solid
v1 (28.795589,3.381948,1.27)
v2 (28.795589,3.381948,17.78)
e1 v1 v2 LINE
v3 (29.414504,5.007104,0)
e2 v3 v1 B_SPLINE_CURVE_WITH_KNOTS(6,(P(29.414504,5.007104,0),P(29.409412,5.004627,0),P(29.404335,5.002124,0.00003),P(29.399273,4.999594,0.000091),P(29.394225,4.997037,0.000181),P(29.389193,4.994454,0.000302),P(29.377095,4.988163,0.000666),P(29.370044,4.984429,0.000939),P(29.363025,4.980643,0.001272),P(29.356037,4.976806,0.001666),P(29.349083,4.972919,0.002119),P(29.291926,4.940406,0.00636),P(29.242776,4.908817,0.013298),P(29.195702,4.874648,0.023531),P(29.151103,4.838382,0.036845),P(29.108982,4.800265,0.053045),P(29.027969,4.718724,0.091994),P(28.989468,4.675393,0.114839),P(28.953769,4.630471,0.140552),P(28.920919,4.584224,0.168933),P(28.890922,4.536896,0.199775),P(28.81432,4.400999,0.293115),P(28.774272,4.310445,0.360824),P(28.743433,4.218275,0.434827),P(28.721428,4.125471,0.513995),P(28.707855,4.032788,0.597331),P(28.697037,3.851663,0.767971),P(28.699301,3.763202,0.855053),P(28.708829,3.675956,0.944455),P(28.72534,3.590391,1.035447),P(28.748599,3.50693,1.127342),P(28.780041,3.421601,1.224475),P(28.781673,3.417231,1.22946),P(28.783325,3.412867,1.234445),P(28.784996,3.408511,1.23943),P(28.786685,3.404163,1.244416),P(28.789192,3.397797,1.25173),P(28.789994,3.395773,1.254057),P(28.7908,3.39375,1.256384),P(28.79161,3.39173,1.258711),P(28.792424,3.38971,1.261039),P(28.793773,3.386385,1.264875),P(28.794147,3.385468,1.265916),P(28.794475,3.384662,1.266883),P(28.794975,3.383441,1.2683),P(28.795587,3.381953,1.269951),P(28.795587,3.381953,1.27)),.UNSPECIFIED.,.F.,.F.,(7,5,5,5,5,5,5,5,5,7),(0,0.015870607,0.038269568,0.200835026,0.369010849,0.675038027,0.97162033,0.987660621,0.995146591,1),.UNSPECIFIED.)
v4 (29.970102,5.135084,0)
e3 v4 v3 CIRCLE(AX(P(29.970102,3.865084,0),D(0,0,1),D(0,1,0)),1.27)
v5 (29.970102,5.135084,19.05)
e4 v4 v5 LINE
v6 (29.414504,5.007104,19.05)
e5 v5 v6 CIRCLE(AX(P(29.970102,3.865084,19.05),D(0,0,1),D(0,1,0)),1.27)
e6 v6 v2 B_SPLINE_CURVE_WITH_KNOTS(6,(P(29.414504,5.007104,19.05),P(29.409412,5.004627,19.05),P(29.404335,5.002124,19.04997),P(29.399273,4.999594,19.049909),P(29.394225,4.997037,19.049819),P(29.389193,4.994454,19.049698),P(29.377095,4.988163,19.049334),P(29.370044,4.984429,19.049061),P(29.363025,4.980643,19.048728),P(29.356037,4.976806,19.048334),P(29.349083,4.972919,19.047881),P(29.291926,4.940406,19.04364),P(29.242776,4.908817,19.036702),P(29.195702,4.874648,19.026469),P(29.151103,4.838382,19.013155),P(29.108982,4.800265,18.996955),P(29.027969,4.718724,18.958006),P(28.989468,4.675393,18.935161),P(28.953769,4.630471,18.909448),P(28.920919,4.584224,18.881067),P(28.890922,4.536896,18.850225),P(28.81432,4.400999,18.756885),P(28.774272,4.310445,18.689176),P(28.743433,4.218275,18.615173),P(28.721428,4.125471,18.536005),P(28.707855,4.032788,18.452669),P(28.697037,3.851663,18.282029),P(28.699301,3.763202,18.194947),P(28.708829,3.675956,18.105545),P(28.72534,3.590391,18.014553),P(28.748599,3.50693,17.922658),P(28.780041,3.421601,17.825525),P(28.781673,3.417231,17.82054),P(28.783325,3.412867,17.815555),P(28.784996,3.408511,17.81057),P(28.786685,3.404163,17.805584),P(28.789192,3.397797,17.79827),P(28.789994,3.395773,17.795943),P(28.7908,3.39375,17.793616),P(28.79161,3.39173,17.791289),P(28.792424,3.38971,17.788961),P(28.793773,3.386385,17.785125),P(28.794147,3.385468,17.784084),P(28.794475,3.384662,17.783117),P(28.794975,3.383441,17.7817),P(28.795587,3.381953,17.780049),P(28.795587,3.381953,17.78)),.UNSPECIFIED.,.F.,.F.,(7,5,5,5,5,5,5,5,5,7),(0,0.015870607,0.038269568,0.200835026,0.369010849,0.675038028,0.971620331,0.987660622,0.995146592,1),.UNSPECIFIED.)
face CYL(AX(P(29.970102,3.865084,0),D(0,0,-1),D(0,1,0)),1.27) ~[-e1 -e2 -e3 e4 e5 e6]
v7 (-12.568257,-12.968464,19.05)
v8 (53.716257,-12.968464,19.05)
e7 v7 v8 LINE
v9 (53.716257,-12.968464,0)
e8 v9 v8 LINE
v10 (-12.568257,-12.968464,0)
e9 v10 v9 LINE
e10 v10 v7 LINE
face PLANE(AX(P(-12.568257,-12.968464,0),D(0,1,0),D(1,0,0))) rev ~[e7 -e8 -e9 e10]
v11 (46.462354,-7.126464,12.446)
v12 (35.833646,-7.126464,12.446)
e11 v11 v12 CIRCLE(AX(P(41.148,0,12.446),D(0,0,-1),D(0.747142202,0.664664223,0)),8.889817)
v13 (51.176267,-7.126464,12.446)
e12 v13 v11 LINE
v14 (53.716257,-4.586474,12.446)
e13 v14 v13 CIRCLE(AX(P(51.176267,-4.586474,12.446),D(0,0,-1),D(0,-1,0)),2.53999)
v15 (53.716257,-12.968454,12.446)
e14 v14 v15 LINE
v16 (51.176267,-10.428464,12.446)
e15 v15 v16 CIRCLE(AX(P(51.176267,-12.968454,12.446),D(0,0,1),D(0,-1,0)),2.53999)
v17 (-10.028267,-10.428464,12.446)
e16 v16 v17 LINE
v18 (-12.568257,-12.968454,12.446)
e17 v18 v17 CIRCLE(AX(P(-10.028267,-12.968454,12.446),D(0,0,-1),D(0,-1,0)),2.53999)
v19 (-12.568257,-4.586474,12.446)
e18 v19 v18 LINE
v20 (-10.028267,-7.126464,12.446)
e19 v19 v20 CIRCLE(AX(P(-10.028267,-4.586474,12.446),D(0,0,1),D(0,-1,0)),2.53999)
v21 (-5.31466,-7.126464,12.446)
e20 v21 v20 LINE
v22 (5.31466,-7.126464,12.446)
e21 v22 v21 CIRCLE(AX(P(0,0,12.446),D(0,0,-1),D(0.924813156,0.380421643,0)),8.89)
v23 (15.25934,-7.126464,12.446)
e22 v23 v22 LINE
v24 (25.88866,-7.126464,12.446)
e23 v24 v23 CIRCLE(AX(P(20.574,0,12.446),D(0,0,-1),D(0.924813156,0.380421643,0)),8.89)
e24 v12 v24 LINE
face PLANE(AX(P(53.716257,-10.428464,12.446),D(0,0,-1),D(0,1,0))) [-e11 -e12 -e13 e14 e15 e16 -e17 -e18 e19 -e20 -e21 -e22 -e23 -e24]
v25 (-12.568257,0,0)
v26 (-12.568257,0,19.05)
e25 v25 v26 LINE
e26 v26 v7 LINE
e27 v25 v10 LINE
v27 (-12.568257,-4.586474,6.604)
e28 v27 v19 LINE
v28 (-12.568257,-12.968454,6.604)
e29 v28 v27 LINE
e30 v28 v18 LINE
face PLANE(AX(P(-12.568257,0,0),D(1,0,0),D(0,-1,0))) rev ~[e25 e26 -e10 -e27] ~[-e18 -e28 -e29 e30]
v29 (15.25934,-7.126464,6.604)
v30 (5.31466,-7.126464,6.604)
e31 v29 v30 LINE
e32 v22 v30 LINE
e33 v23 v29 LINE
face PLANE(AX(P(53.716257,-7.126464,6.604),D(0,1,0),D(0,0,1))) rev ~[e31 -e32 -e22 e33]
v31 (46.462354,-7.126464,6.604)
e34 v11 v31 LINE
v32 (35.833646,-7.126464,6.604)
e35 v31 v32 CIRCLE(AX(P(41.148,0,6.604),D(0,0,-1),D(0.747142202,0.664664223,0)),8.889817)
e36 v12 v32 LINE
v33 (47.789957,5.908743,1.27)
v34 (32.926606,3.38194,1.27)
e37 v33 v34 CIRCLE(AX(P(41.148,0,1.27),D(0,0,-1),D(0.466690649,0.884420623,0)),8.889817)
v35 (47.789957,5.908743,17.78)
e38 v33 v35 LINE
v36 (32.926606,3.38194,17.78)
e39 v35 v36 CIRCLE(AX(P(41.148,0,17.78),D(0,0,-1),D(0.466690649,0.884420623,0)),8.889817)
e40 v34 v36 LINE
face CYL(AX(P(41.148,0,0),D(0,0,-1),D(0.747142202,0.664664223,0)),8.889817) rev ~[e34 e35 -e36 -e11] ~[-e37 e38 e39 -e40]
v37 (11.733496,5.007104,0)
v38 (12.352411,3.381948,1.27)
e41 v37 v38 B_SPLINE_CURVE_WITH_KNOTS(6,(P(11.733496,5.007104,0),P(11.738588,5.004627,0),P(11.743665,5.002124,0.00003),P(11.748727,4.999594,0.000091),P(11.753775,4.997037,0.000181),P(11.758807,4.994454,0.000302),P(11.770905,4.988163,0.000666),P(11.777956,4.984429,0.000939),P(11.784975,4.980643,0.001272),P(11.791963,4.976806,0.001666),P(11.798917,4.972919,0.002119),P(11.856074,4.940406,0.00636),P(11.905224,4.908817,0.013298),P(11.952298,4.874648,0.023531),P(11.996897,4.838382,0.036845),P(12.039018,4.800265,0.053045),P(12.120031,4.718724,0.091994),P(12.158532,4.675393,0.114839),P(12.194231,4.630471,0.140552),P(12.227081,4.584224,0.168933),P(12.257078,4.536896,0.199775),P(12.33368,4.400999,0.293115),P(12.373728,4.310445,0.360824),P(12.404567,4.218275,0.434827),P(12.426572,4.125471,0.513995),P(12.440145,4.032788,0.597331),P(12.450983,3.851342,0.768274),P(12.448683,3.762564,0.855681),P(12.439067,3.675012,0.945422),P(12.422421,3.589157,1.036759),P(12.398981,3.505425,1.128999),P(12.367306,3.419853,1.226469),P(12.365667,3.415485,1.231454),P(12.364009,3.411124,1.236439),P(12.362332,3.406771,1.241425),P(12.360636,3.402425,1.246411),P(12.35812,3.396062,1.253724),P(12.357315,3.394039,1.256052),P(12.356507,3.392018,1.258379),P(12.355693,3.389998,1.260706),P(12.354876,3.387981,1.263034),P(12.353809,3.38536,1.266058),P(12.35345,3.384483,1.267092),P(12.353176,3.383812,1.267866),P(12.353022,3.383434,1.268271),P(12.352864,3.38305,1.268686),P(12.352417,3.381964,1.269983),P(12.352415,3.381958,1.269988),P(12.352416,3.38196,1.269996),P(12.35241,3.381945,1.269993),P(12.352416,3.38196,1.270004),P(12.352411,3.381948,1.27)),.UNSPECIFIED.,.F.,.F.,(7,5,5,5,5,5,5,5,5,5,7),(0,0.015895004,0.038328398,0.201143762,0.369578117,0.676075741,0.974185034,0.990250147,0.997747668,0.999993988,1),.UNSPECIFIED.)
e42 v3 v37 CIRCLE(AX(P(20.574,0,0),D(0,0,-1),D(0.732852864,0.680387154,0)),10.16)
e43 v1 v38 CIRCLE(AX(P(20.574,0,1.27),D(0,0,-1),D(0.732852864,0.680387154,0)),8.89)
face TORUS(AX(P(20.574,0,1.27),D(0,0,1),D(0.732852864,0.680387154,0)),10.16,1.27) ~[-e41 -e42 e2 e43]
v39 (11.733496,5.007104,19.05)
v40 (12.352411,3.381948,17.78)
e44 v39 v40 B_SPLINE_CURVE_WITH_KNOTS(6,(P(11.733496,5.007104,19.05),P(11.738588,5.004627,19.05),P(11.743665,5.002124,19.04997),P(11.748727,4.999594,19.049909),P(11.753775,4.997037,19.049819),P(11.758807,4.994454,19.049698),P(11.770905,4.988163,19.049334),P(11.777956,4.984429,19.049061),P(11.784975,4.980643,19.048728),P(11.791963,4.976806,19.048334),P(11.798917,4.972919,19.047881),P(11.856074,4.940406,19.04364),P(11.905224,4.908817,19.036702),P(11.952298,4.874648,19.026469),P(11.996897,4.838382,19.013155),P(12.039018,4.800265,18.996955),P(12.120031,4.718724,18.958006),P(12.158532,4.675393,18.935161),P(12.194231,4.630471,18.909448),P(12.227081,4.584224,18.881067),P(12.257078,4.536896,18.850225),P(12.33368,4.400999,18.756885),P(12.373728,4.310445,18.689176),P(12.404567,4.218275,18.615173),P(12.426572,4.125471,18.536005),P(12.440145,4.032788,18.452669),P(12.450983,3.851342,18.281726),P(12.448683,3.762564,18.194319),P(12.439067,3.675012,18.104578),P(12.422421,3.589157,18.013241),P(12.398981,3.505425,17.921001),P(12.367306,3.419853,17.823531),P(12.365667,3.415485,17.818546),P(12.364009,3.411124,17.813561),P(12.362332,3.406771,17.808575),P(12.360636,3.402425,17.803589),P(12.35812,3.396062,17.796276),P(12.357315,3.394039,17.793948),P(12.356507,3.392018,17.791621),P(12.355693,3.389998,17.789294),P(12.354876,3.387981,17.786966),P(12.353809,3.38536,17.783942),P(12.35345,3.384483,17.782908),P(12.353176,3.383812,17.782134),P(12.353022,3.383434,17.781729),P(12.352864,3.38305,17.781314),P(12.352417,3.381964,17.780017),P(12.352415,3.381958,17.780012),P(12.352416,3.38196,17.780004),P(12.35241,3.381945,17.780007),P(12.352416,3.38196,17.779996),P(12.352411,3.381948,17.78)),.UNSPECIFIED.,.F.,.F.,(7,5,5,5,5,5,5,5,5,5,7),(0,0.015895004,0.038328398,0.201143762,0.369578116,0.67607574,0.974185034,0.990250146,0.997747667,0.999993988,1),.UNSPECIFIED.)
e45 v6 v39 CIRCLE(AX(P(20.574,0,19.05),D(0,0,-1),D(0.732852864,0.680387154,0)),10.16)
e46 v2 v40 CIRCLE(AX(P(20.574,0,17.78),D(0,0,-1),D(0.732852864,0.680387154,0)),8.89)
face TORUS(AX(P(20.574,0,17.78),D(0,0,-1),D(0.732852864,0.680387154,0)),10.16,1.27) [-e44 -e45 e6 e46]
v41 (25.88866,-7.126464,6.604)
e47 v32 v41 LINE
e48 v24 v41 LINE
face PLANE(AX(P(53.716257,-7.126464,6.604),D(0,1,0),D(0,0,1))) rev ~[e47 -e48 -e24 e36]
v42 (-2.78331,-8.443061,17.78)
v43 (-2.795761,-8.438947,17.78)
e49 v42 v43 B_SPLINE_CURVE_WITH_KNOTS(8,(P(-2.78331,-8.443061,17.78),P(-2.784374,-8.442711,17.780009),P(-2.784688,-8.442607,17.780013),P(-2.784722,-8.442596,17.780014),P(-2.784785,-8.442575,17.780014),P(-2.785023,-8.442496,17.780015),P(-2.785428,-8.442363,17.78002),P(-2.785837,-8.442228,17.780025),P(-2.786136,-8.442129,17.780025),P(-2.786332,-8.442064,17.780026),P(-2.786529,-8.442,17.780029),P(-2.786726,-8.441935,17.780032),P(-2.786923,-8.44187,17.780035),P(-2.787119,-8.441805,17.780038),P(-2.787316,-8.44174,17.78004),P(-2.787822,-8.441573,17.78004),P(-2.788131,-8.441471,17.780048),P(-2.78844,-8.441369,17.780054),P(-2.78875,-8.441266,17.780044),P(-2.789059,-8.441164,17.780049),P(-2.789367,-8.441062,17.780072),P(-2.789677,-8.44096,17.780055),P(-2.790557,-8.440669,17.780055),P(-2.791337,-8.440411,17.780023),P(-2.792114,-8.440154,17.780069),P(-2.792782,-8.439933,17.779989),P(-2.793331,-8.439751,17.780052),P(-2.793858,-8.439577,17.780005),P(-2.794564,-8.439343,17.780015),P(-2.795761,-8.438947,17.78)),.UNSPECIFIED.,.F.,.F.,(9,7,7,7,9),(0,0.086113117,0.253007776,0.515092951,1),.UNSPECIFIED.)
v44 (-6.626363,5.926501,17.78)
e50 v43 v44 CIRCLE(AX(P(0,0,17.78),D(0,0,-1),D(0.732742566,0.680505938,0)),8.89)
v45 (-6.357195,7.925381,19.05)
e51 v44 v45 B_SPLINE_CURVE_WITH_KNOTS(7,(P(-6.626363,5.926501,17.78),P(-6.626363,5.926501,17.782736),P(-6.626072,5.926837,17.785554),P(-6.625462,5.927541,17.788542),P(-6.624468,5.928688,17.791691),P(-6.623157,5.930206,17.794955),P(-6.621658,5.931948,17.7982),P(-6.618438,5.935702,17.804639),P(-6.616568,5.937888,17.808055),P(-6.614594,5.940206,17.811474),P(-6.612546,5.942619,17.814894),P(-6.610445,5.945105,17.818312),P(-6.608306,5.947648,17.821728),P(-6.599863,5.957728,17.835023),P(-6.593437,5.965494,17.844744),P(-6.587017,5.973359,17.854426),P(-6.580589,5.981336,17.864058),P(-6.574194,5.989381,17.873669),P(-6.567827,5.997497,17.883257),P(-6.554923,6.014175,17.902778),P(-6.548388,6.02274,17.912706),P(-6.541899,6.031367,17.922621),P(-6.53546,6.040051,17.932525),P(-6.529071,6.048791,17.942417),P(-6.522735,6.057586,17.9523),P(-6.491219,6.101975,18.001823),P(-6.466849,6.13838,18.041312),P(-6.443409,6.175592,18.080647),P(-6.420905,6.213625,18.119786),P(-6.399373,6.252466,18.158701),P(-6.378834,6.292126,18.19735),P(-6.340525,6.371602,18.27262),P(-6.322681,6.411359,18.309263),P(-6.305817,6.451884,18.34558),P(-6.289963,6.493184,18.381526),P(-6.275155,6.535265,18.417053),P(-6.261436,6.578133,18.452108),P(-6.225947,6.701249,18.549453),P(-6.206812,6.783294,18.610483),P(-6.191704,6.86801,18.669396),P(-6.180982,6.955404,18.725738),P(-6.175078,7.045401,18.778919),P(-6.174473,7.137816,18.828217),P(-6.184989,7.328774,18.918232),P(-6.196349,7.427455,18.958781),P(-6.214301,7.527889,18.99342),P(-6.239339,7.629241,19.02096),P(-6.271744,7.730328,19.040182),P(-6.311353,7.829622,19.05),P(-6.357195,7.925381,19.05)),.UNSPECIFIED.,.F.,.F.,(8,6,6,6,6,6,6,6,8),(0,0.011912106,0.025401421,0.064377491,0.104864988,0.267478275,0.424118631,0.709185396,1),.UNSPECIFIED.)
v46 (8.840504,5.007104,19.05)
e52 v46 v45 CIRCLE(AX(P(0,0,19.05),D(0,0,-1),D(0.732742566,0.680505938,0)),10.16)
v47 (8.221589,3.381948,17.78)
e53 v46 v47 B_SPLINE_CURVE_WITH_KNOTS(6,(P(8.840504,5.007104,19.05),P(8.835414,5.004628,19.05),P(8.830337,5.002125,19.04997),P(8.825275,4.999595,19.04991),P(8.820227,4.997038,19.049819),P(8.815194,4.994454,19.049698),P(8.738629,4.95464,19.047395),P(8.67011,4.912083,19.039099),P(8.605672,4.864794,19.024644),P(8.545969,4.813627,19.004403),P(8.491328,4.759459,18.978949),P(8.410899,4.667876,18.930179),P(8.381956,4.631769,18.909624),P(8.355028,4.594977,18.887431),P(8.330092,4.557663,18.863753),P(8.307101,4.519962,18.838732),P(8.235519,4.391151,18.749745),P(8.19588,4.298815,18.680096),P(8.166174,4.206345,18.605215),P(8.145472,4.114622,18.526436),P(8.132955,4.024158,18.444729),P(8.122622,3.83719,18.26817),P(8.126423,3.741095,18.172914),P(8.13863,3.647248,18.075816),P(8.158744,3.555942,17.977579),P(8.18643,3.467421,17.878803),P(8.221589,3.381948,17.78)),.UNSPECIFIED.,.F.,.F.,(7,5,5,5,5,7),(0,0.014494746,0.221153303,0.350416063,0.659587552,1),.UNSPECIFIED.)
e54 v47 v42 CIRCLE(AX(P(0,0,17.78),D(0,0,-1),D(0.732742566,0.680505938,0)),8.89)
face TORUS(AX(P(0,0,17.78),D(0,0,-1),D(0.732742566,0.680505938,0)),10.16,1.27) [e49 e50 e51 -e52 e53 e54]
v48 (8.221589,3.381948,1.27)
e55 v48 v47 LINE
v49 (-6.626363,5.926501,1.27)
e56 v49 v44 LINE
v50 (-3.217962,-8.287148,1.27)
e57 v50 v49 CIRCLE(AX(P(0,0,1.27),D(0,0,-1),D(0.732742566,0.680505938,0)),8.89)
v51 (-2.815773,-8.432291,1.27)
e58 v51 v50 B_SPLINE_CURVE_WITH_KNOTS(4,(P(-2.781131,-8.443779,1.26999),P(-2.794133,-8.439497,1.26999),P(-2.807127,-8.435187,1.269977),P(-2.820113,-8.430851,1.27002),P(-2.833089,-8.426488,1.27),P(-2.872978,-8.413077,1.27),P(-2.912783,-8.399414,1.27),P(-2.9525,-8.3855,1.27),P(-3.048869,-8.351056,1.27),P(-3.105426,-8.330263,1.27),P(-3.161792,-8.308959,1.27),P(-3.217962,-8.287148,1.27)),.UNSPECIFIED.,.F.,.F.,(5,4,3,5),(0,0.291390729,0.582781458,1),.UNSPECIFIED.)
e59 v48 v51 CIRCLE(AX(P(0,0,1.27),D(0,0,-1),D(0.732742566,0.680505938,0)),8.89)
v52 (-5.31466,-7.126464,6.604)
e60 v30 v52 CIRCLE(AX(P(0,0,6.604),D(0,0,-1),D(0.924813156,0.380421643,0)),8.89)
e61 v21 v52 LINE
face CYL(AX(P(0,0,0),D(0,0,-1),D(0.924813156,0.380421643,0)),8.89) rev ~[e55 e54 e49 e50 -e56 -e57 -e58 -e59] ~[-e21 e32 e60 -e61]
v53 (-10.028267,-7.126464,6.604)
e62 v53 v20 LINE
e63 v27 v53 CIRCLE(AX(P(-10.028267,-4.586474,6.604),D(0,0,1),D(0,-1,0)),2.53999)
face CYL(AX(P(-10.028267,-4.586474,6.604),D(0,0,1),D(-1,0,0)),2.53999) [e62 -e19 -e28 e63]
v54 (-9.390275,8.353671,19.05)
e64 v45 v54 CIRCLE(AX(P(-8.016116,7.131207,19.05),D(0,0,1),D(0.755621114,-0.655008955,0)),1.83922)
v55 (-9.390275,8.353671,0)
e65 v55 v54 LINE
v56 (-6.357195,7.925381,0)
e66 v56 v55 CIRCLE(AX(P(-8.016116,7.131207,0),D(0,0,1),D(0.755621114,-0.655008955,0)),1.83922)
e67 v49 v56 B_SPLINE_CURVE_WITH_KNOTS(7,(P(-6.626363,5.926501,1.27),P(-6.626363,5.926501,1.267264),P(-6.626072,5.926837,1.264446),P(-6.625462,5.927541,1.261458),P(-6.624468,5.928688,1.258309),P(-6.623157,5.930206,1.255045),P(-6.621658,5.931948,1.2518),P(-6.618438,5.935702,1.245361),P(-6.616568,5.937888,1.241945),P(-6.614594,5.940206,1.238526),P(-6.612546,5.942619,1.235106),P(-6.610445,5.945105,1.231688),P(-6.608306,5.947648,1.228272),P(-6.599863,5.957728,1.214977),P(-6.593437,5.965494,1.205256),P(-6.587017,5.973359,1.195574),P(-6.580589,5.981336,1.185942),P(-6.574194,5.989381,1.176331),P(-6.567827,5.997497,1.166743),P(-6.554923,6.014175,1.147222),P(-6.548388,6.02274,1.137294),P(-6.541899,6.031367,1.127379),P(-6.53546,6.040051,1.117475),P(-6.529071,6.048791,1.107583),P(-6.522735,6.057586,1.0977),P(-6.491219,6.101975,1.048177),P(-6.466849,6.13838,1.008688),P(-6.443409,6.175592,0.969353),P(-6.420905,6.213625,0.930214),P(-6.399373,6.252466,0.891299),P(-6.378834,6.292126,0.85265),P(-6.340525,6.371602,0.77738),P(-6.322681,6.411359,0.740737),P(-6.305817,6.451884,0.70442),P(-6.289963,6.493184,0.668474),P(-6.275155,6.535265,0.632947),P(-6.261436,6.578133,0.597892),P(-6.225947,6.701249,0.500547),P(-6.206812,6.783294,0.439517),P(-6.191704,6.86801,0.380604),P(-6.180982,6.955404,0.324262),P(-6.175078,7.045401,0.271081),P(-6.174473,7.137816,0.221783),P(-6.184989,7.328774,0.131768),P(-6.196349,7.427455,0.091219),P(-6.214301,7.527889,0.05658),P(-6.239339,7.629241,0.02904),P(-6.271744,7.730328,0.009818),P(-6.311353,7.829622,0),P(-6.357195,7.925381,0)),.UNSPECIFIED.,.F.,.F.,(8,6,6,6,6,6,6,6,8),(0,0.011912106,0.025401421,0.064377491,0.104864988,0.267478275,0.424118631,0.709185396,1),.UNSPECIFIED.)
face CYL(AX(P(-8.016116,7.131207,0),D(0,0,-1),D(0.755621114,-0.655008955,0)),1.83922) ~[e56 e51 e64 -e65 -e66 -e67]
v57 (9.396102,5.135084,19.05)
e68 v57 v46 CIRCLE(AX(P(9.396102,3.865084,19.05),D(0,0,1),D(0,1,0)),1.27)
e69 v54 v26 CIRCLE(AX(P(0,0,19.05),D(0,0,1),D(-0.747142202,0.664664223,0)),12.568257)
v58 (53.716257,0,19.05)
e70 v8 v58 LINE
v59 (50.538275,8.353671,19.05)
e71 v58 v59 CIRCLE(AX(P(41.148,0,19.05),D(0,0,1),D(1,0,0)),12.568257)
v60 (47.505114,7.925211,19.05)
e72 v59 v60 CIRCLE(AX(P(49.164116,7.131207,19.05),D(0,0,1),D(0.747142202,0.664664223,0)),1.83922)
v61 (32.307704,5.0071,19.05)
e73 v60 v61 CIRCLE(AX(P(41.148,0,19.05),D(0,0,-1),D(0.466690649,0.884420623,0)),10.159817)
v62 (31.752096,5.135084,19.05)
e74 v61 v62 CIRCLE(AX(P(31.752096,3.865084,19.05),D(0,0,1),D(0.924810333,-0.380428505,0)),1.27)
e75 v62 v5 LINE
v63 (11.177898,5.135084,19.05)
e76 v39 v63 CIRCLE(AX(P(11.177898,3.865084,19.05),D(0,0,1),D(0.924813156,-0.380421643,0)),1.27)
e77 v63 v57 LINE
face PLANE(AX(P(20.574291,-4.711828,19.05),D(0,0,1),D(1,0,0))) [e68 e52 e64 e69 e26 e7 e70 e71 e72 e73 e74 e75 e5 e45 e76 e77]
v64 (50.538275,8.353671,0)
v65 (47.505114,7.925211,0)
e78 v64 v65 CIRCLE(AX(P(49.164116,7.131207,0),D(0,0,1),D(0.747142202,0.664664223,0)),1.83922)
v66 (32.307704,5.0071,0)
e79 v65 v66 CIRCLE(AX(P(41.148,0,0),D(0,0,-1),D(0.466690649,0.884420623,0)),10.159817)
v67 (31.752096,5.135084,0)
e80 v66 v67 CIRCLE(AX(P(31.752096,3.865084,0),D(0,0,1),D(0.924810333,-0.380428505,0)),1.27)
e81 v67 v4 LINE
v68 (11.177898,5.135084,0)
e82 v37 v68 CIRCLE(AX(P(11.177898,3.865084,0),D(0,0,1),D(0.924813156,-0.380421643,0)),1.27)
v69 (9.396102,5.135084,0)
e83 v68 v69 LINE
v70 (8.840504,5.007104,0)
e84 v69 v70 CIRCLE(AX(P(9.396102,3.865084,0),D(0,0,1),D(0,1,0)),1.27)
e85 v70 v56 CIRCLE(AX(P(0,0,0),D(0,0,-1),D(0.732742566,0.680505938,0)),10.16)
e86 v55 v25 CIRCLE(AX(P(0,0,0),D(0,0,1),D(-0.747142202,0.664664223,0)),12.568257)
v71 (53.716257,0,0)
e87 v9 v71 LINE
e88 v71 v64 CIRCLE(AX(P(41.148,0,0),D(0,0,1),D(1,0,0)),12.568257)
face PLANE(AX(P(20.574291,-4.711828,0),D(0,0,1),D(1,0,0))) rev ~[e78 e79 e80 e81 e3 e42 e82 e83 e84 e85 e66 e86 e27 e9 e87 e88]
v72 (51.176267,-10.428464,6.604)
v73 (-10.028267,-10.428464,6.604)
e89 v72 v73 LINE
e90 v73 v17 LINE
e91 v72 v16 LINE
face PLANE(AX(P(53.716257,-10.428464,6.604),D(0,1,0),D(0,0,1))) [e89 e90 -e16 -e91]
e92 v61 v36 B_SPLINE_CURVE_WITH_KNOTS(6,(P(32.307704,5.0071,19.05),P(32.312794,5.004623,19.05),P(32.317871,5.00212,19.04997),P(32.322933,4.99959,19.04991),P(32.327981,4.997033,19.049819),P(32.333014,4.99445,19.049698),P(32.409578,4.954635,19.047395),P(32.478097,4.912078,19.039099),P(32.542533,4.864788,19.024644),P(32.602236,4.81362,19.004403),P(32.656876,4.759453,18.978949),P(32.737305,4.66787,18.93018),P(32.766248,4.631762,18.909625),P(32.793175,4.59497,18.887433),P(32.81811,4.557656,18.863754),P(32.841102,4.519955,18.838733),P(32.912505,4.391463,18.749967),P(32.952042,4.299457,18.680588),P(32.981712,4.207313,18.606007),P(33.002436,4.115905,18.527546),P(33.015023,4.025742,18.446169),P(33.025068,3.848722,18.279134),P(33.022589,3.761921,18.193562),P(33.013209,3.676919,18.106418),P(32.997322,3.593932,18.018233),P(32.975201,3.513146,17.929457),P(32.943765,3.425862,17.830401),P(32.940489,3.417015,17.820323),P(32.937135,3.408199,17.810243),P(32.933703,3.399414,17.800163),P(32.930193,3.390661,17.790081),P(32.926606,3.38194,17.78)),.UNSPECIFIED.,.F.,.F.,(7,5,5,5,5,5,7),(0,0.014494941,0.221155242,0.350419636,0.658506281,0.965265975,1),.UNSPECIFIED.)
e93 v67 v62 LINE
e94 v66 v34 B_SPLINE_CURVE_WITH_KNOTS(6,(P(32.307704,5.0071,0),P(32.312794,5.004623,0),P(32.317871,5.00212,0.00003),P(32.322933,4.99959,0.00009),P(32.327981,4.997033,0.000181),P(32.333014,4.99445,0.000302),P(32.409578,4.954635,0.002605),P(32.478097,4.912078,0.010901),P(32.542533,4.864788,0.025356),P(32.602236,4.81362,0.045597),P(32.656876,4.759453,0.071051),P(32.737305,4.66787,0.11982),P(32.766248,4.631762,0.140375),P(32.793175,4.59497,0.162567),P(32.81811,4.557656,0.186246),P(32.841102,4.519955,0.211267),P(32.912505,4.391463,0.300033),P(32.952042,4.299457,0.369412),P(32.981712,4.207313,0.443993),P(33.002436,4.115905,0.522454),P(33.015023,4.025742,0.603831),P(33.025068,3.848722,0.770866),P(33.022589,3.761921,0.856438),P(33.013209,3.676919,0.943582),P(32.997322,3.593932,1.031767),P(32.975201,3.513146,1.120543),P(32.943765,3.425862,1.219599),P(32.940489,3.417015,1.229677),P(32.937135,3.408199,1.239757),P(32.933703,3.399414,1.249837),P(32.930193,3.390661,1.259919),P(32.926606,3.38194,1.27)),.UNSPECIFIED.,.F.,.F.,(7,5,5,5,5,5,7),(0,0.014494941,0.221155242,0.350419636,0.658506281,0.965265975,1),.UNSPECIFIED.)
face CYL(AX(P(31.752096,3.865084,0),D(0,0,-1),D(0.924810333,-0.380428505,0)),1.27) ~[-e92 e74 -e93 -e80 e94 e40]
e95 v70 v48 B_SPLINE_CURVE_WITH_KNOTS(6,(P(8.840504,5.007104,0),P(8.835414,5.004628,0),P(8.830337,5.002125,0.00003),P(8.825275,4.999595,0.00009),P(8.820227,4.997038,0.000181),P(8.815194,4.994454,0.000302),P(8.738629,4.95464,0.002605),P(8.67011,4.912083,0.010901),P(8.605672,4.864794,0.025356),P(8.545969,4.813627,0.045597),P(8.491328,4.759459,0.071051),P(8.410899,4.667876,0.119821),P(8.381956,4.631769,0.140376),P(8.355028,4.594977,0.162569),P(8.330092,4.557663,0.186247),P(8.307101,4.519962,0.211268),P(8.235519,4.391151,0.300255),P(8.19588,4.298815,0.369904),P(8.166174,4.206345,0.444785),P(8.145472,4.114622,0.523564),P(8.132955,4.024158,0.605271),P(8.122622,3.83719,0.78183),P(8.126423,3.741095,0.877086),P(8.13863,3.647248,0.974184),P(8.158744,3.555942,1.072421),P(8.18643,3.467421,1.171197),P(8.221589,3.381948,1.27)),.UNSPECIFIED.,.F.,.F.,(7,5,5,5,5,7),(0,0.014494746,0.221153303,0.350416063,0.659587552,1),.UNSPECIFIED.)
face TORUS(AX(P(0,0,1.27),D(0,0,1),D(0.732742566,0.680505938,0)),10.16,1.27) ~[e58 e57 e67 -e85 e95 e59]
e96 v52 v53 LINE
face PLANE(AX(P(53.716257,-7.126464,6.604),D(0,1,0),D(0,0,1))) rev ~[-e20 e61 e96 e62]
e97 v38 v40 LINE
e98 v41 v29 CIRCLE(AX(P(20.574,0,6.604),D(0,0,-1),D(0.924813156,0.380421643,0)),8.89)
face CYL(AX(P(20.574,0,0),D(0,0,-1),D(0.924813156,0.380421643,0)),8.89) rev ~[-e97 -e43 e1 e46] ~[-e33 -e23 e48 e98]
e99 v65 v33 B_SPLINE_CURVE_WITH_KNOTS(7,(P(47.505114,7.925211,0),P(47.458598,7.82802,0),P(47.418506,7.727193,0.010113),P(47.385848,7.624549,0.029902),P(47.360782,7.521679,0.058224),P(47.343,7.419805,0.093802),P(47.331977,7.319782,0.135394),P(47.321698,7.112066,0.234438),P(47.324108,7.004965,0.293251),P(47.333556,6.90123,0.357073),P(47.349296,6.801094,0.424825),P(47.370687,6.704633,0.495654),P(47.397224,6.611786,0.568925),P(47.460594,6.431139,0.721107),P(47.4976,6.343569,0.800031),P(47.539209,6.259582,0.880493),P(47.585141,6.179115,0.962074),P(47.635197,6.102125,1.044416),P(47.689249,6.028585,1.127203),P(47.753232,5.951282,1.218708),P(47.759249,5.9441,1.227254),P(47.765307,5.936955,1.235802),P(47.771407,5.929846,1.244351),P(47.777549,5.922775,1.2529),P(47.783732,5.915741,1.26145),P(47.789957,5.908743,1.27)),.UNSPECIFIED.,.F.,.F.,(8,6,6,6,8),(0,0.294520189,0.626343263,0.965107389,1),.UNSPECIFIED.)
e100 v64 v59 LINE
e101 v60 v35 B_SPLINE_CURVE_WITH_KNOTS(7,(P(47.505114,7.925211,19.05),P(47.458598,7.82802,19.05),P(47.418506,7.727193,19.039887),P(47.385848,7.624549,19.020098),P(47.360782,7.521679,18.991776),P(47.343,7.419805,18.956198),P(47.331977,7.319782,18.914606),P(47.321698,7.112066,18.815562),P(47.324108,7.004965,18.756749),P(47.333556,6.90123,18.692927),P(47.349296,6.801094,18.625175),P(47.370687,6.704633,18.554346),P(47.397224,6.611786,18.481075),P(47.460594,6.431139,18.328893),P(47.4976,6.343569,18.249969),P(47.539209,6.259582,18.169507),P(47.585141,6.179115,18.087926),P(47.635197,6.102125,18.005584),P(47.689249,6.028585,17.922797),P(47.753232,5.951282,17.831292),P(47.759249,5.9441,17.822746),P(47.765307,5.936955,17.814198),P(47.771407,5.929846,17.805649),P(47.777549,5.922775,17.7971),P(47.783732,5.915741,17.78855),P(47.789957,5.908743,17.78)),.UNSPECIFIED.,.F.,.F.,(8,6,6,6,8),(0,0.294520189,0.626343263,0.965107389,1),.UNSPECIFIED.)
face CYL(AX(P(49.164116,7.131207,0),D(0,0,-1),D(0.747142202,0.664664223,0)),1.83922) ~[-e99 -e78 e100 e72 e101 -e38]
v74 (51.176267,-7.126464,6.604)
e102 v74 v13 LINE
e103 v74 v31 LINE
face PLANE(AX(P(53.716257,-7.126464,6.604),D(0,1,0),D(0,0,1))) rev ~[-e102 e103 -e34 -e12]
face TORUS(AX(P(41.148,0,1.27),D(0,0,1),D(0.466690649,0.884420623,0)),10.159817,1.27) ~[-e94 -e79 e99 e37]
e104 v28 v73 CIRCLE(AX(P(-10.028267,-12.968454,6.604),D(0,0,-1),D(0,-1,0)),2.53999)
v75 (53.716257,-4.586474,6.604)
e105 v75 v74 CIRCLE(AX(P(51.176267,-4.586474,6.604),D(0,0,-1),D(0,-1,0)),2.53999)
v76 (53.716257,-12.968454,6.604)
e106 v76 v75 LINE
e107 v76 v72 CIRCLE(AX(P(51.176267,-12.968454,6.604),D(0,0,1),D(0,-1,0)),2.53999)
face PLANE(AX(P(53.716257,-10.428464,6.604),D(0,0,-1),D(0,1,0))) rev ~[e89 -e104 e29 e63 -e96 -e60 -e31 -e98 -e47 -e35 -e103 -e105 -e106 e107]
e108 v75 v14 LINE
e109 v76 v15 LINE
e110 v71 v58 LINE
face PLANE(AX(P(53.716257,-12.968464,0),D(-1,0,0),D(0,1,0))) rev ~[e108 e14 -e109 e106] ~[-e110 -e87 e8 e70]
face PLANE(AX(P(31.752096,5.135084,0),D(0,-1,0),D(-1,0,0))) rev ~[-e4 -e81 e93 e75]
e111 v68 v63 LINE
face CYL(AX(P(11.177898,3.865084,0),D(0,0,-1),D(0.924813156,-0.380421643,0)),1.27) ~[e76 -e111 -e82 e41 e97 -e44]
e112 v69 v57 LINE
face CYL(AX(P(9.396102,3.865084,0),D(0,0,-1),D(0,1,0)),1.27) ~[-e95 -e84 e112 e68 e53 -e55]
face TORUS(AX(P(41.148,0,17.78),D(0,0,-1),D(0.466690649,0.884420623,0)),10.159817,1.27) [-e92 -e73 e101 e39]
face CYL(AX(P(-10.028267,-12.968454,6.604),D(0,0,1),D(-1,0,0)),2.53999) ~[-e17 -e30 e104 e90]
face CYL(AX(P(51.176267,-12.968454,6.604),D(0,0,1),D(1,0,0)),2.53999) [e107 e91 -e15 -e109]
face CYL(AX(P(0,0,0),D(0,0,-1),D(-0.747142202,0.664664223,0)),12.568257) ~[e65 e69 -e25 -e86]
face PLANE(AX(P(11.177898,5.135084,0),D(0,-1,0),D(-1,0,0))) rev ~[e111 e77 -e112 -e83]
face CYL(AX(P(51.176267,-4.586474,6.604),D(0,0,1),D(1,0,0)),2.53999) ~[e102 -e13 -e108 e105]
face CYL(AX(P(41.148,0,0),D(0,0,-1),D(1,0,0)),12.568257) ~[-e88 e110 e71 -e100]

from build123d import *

# Parameters (mm, degrees)
F1_DEPTH     = 19.05
F3_W         = 3.302
F3_H         = 5.842
F4_DEPTH     = 66.2855144291
F5_R         = 2.53999
F6_T2_ANGLE  = 285.0642711804
F6_T4_ANGLE  = 265.7478080458
F6_T6_ANGLE  = 285.2154653986
F6_T8_ANGLE  = 285.2154653986
F6_T10_ANGLE = 265.7478080458
F6_T12_ANGLE = 285.0642711804


# Not quite as in the source:
# - a fillet or chamfer that OpenCascade refuses, or shapes differently, is made with other operations: its cross-section is extruded or revolved along the edge and cut away or added
# - a fillet or chamfer is up to 0.001 mm smaller than in the source, because OpenCascade refuses the exact size


with BuildPart() as f1:
    # F0 (on Top) → F1 (new body)
    with BuildSketch(Plane.XY):
        with BuildLine():
            Line((-12.5682572145, -12.9684638232), (53.7162572145, -12.9684638232))
            Line((53.7162572145, -12.9684638232), (53.7162572145, 0))
            ThreePointArc((53.7162572145, 0), (52.8949248233, 4.4688753179), (50.5382753725, 8.35367092))
            ThreePointArc((50.5382753725, 8.35367092), (47.9416524269, 8.5053660876), (47.7899572593, 5.908743142))
            ThreePointArc((47.7899572593, 5.908743142), (42.6379125223, -8.7640745335), (32.9266056139, 3.3819396952))
            ThreePointArc((32.9266056139, 3.3819396952), (32.807201494, 4.5719455748), (31.7520964907, 5.1350838967))
            Line((31.7520964907, 5.1350838967), (29.9701016635, 5.1350838967))
            ThreePointArc((29.9701016635, 5.1350838967), (28.9149992826, 4.5719494891), (28.7955889556, 3.3819484096))
            ThreePointArc((28.7955889556, 3.3819484096), (20.574, -8.89), (12.3524110444, 3.3819484096))
            ThreePointArc((12.3524110444, 3.3819484096), (12.2330007174, 4.5719494891), (11.1778983365, 5.1350838967))
            Line((11.1778983365, 5.1350838967), (9.3961016635, 5.1350838967))
            ThreePointArc((9.3961016635, 5.1350838967), (8.3409992826, 4.5719494891), (8.2215889556, 3.3819484096))
            ThreePointArc((8.2215889556, 3.3819484096), (-1.501623816, -8.7622614612), (-6.6263626723, 5.9265013064))
            ThreePointArc((-6.6263626723, 5.9265013064), (-6.8025064605, 8.5131919049), (-9.3902753725, 8.35367092))
            ThreePointArc((-9.3902753725, 8.35367092), (-11.7469248233, 4.4688753179), (-12.5682572145, 0))
            Line((-12.5682572145, 0), (-12.5682572145, -12.9684638232))
        make_face()
    extrude(amount=F1_DEPTH)

    # F3 (on offset) → F4 (cut, through all)
    with BuildSketch(Plane.YZ.offset(53.7162572145)):
        with Locations((-8.7774638232, 9.525)):
            Rectangle(F3_W, F3_H)
    extrude(amount=-F4_DEPTH, mode=Mode.SUBTRACT)

    # F5 (radius 2.54 in the source; OpenCascade refuses exactly that, so slightly less here)
    f5_edges = [f1.edges().sort_by_distance(p)[0] for p in [
        (53.716257, -10.428464, 9.525),
        (53.716257, -7.126464, 9.525),
        (-12.568257, -7.126464, 9.525),
        (-12.568257, -10.428464, 9.525),
    ]]
    fillet(f5_edges, radius=F5_R)

    # F6: fillet of radius 1.27 on 6 edges, made by hand

    # F6_s1 → F6_t2 (revolve, cut)
    with BuildSketch(Plane(origin=(32.1859589237, -16.9838713477, 0), x_dir=(0, 0, 1), z_dir=(-0.8844206226, 0.4666906494, 0))):
        with BuildLine():
            ThreePointArc((1.27, 28.0932035867), (0.3719743879, 28.4651779746), (0, 29.3632035867))
            Line((0, 29.3632035867), (0, 28.0932035867))
            Line((0, 28.0932035867), (1.27, 28.0932035867))
        make_face()
    revolve(axis=Axis((41.148, 0, 0), (0, 0, -1)), revolution_arc=F6_T2_ANGLE, mode=Mode.SUBTRACT)

    # F6_s3 → F6_t4 (revolve, cut)
    with BuildSketch(Plane(origin=(9.5242534962, -10.2586834814, 0), x_dir=(0, 0, 1), z_dir=(-0.6803871538, 0.7328528644, 0))):
        with BuildLine():
            ThreePointArc((1.27, 23.9677148325), (0.3719743879, 24.3396892203), (0, 25.2377148325))
            Line((0, 25.2377148325), (0, 23.9677148325))
            Line((0, 23.9677148325), (1.27, 23.9677148325))
        make_face()
    revolve(axis=Axis((20.574, 0, 0), (0, 0, -1)), revolution_arc=F6_T4_ANGLE, mode=Mode.SUBTRACT)

    # F6_s5 → F6_t6 (revolve, cut)
    with BuildSketch(Plane(origin=(0, 0, 0), x_dir=(0, 0, 1), z_dir=(-0.6805059381, 0.7327425661, 0))):
        with BuildLine():
            ThreePointArc((1.27, 8.89), (0.3719743879, 9.2619743879), (0, 10.16))
            Line((0, 10.16), (0, 8.89))
            Line((0, 8.89), (1.27, 8.89))
        make_face()
    revolve(axis=Axis((0, 0, 0), (0, 0, -1)), revolution_arc=F6_T6_ANGLE, mode=Mode.SUBTRACT)

    # F6_s7 → F6_t8 (revolve, cut)
    with BuildSketch(Plane(origin=(0, 0, 0), x_dir=(0, 0, 1), z_dir=(-0.6805059381, 0.7327425661, 0))):
        with BuildLine():
            ThreePointArc((17.78, 8.89), (18.6780256121, 9.2619743879), (19.05, 10.16))
            Line((19.05, 10.16), (19.05, 8.89))
            Line((19.05, 8.89), (17.78, 8.89))
        make_face()
    revolve(axis=Axis((0, 0, 19.05), (0, 0, -1)), revolution_arc=F6_T8_ANGLE, mode=Mode.SUBTRACT)

    # F6_s9 → F6_t10 (revolve, cut)
    with BuildSketch(Plane(origin=(9.5242534962, -10.2586834814, 0), x_dir=(0, 0, 1), z_dir=(-0.6803871538, 0.7328528644, 0))):
        with BuildLine():
            ThreePointArc((17.78, 23.9677148325), (18.6780256121, 24.3396892203), (19.05, 25.2377148325))
            Line((19.05, 25.2377148325), (19.05, 23.9677148325))
            Line((19.05, 23.9677148325), (17.78, 23.9677148325))
        make_face()
    revolve(axis=Axis((20.574, 0, 19.05), (0, 0, -1)), revolution_arc=F6_T10_ANGLE, mode=Mode.SUBTRACT)

    # F6_s11 → F6_t12 (revolve, cut)
    with BuildSketch(Plane(origin=(32.1859589237, -16.9838713477, 0), x_dir=(0, 0, 1), z_dir=(-0.8844206226, 0.4666906494, 0))):
        with BuildLine():
            ThreePointArc((17.78, 28.0932035867), (18.6780256121, 28.4651779746), (19.05, 29.3632035867))
            Line((19.05, 29.3632035867), (19.05, 28.0932035867))
            Line((19.05, 28.0932035867), (17.78, 28.0932035867))
        make_face()
    revolve(axis=Axis((41.148, 0, 19.05), (0, 0, -1)), revolution_arc=F6_T12_ANGLE, mode=Mode.SUBTRACT)


solid = f1.part
